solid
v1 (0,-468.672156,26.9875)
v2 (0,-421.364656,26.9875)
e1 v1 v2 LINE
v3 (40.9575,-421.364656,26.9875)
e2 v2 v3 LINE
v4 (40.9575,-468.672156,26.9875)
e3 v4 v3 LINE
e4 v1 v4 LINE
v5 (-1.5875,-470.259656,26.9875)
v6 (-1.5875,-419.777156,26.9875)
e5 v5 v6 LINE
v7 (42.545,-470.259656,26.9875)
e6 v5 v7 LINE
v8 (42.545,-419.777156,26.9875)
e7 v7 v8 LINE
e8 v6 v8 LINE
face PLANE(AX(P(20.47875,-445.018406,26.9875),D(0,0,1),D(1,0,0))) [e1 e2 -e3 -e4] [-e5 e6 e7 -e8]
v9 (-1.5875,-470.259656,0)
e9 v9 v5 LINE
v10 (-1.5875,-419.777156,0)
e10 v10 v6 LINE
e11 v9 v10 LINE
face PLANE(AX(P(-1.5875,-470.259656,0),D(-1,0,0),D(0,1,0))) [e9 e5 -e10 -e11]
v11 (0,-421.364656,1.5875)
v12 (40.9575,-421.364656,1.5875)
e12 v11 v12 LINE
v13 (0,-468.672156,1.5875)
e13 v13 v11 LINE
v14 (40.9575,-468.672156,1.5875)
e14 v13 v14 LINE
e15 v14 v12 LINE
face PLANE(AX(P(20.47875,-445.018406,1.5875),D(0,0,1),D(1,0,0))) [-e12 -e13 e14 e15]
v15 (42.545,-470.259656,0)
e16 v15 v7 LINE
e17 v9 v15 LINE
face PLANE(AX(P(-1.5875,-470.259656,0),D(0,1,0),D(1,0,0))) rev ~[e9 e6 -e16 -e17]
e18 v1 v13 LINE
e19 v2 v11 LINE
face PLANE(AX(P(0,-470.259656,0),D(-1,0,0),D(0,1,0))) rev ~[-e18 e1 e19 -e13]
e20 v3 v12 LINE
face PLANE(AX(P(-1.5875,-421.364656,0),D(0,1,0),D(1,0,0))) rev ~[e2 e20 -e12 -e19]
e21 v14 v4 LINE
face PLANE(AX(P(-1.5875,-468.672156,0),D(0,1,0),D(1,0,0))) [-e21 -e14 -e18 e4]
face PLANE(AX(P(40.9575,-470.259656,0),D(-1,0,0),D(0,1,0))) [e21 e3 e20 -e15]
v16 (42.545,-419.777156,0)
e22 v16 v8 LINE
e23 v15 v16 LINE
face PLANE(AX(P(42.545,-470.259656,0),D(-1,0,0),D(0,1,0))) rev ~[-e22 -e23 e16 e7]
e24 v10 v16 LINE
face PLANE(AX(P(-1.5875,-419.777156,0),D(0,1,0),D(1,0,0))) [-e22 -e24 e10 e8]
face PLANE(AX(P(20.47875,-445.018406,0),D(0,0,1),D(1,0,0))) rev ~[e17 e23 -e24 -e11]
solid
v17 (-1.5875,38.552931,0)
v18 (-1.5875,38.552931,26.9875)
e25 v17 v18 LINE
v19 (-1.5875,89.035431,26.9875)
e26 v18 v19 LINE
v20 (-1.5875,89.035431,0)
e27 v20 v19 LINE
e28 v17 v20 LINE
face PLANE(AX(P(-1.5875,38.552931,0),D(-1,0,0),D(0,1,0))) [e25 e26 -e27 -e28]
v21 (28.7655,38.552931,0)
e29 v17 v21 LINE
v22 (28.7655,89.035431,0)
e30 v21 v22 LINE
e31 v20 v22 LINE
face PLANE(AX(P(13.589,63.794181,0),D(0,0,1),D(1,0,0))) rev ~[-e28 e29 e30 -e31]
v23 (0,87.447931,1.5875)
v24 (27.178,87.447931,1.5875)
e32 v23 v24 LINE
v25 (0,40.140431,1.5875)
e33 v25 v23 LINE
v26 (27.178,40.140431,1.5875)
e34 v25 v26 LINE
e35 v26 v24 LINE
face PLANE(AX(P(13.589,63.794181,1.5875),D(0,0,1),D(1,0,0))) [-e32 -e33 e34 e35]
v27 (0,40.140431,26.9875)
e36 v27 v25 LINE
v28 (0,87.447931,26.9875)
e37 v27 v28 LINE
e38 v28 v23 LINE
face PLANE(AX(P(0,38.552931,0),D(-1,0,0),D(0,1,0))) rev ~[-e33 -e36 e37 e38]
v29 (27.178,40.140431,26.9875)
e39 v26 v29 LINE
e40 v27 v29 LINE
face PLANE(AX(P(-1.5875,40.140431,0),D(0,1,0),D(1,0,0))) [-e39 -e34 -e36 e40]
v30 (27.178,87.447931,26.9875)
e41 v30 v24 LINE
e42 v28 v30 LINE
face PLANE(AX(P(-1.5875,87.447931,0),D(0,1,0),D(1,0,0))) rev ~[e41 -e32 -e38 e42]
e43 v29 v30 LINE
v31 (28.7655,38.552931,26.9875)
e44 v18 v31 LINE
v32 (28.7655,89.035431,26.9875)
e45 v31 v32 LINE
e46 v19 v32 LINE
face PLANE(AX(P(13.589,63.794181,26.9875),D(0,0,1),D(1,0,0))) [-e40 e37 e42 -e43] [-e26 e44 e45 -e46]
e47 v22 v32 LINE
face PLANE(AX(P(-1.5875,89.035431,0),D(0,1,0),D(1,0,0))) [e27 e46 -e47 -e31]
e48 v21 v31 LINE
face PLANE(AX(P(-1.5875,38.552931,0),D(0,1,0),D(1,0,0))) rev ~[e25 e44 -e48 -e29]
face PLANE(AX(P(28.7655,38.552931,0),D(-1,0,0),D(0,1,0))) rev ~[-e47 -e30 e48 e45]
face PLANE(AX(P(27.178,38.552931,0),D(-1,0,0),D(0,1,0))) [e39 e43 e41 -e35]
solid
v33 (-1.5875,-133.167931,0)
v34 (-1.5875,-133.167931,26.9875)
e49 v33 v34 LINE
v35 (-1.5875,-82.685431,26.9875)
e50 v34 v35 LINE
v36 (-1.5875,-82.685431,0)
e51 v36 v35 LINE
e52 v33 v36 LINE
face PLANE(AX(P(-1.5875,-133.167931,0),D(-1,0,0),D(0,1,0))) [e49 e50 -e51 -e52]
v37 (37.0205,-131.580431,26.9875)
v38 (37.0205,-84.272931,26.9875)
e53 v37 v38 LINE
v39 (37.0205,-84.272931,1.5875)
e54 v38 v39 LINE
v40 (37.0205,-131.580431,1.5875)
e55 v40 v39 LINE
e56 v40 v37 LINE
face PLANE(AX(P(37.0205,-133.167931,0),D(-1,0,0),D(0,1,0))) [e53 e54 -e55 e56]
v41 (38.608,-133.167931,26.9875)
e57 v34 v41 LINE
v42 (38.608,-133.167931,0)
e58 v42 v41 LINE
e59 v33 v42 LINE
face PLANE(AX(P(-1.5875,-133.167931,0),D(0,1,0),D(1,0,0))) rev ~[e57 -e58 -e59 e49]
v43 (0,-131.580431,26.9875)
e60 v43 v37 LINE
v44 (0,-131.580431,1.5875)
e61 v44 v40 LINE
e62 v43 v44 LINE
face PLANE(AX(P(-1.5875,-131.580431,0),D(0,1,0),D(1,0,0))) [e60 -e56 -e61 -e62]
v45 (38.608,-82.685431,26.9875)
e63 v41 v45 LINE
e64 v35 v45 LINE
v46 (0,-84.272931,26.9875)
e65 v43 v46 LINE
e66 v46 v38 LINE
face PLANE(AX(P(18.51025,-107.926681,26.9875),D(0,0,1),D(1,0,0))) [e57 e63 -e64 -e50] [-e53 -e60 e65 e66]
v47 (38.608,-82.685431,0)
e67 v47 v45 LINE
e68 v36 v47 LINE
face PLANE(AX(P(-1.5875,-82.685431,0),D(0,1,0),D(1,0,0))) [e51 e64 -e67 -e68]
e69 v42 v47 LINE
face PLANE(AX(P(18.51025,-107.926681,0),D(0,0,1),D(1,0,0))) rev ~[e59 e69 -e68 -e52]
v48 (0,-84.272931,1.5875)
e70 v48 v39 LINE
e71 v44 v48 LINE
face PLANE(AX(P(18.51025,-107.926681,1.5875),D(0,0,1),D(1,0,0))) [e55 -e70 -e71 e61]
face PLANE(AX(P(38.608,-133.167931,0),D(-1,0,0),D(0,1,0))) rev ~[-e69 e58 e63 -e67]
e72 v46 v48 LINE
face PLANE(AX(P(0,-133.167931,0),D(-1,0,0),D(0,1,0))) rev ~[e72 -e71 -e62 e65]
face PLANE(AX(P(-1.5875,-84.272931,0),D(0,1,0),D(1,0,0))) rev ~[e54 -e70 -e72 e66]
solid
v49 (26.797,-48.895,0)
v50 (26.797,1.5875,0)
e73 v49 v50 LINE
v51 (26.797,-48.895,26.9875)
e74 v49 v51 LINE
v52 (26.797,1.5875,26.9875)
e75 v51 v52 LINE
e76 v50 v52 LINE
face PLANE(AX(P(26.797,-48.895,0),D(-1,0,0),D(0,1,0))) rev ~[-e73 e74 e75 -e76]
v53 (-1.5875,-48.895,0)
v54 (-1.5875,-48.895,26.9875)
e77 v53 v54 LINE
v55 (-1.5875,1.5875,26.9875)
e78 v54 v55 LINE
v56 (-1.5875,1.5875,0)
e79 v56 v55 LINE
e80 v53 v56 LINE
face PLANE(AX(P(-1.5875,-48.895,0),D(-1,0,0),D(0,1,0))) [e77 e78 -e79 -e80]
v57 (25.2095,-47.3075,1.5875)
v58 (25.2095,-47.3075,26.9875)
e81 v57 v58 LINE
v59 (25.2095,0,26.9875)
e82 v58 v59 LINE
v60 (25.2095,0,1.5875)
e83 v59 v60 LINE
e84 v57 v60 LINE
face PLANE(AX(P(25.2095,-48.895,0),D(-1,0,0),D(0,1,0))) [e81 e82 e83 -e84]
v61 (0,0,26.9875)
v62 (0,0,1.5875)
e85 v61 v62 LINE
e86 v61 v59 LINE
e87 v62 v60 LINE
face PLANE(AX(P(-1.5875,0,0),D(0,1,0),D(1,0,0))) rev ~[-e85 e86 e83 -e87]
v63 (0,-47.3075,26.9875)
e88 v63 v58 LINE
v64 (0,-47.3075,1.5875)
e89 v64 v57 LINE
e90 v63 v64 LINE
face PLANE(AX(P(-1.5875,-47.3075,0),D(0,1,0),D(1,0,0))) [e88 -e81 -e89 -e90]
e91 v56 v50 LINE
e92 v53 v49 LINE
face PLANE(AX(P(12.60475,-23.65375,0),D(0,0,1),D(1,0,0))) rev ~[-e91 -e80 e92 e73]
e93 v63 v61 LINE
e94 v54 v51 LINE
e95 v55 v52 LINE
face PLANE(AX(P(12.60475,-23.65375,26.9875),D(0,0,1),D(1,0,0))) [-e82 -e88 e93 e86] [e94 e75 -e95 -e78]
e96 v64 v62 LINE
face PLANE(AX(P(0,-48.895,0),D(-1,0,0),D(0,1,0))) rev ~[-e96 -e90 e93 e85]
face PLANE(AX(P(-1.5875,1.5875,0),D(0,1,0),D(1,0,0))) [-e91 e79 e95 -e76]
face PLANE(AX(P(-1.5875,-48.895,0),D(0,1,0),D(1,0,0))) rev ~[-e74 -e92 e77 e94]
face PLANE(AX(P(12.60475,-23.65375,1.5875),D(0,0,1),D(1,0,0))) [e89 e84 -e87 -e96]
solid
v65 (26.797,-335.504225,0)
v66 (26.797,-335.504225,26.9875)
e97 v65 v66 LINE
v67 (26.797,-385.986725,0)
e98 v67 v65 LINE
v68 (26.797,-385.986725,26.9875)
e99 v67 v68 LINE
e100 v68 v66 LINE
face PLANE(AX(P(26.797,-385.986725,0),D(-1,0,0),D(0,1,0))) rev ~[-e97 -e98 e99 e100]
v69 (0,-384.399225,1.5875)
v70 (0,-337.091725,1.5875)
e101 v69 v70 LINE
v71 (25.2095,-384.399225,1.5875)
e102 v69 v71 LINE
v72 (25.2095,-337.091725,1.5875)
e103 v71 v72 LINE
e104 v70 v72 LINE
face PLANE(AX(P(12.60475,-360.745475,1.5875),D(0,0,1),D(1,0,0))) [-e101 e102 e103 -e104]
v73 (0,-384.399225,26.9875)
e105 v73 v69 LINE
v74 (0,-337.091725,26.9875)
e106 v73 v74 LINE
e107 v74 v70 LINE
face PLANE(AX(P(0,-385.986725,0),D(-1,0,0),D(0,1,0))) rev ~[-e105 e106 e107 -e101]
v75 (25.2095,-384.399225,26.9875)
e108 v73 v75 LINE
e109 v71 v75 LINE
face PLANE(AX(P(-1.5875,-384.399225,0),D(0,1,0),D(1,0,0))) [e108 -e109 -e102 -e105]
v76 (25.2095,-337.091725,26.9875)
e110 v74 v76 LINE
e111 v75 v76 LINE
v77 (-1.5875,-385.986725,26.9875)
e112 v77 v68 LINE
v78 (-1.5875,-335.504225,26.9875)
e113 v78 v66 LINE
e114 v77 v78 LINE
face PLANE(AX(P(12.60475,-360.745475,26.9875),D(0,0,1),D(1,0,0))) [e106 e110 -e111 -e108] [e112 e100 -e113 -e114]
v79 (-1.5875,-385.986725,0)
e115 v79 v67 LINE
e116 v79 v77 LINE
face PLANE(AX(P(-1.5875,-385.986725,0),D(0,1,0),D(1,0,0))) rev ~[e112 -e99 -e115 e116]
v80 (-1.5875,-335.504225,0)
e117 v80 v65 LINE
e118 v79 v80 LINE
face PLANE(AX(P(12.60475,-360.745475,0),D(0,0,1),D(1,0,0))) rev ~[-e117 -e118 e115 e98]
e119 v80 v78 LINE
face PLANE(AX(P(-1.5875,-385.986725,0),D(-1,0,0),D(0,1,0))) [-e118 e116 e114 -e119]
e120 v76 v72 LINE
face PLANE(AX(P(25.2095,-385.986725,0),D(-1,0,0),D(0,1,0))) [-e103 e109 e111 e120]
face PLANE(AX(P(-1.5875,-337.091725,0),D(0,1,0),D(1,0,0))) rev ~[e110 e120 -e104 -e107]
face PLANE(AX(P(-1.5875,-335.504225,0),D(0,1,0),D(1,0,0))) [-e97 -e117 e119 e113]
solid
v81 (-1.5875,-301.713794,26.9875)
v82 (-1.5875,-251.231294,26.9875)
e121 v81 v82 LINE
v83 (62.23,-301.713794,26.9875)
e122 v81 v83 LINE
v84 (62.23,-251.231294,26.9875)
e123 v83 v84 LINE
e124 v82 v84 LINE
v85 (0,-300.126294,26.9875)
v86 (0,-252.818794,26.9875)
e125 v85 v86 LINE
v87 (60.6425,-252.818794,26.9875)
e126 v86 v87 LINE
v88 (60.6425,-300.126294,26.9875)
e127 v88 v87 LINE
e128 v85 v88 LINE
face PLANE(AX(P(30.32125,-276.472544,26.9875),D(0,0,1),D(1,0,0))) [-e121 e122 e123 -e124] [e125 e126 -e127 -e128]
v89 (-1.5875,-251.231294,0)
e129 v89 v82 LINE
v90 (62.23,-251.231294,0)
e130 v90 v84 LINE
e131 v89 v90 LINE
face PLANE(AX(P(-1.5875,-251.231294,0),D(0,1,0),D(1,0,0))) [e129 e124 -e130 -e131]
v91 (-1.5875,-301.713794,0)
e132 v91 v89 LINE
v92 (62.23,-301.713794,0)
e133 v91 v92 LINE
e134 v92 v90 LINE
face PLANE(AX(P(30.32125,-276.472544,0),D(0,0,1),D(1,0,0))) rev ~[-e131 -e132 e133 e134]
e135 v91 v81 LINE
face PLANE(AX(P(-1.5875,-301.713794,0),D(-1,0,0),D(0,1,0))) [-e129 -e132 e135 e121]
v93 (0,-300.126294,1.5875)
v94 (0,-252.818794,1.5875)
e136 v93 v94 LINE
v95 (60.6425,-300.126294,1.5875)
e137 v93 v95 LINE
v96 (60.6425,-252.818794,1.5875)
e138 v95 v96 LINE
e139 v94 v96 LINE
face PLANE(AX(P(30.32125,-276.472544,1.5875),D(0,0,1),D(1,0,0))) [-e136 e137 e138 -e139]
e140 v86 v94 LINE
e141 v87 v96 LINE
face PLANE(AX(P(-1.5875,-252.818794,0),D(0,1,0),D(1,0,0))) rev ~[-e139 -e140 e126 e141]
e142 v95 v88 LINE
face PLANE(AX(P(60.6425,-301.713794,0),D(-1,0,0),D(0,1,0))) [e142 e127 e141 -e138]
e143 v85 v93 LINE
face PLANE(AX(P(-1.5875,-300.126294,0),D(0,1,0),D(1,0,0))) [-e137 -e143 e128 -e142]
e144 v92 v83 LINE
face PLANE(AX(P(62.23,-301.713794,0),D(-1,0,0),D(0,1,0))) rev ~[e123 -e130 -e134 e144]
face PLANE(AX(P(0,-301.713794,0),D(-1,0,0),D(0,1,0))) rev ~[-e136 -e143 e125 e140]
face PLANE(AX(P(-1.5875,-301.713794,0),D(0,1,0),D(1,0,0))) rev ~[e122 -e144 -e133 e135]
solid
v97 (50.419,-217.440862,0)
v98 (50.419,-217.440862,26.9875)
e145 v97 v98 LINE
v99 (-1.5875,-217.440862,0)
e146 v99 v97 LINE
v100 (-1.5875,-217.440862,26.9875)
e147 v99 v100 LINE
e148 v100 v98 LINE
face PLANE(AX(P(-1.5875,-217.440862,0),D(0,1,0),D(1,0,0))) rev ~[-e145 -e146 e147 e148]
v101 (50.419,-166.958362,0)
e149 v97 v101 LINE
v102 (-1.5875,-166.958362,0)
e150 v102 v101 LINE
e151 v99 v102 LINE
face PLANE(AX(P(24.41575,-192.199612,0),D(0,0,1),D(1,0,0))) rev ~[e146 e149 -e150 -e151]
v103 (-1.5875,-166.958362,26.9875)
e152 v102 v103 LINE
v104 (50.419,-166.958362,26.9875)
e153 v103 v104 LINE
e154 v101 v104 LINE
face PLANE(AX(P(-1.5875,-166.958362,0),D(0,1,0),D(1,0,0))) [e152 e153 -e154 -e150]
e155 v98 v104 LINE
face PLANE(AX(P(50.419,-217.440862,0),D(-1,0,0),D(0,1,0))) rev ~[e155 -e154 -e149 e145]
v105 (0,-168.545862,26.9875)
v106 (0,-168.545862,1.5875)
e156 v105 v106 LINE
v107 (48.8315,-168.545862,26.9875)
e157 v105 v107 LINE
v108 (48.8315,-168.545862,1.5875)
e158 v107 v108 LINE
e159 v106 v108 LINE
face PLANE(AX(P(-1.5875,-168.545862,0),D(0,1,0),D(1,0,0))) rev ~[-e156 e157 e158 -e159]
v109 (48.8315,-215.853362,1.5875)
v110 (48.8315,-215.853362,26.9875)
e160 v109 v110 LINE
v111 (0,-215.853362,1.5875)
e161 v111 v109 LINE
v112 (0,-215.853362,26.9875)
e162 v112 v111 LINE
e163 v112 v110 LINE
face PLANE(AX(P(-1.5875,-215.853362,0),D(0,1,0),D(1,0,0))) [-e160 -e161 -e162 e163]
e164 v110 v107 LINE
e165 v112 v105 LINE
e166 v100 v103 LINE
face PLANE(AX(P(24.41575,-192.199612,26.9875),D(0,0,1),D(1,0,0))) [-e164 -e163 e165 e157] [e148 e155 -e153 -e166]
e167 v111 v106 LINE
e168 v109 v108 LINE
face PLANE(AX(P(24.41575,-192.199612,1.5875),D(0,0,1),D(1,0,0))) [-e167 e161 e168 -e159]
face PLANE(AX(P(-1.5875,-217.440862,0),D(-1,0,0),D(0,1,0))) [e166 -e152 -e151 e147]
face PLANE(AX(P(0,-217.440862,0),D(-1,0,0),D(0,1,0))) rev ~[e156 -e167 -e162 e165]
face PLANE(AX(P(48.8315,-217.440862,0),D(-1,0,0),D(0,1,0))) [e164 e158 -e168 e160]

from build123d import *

# Parameters (mm, degrees)
F3_W     = 30.353
F3_H     = 50.4825
F4_DEPTH = 26.9875
F3_W_2   = 28.3845
F3_W_3   = 40.1955
F3_W_4   = 52.0065
F3_W_5   = 63.8175
F3_W_6   = 44.1325
F5_T     = -1.5875
F5_2_T   = -1.5875
F5_3_T   = -1.5875
F5_4_T   = -1.5875
F5_5_T   = -1.5875
F5_6_T   = -1.5875
F5_7_T   = -1.5875


# Not quite as in the source:
# - a variable given as a bare number and used for a length is read in inches; the dataset says mm whatever the document's units were
# - a feature names something its author has since deleted; it is built from what else it names


with BuildPart() as f4:
    # F3 (on Top) → F4 (new body)
    with BuildSketch(Plane.XY):
        with Locations((13.589, 63.7941811943)):
            Rectangle(F3_W, F3_H)
    extrude(amount=F4_DEPTH)

    # F5#7
    f5_7_openings = [f4.faces().sort_by_distance(p)[0] for p in [
        (13.589, 63.794181, 26.9875),
    ]]
    offset(amount=F5_7_T, openings=f5_7_openings)


with BuildPart() as f4b:
    # F3 (on Top) → F4, piece 2 (new body)
    with BuildSketch(Plane.XY):
        with Locations((12.60475, -23.65375)):
            Rectangle(F3_W_2, F3_H)
    extrude(amount=F4_DEPTH)

    # F5#6
    f5_6_openings = [f4b.faces().sort_by_distance(p)[0] for p in [
        (12.60475, -23.65375, 26.9875),
    ]]
    offset(amount=F5_6_T, openings=f5_6_openings)


with BuildPart() as f4c:
    # F3 (on Top) → F4, piece 3 (new body)
    with BuildSketch(Plane.XY):
        with Locations((18.51025, -107.9266811943)):
            Rectangle(F3_W_3, F3_H)
    extrude(amount=F4_DEPTH)

    # F5#5
    f5_5_openings = [f4c.faces().sort_by_distance(p)[0] for p in [
        (18.51025, -107.926681, 26.9875),
    ]]
    offset(amount=F5_5_T, openings=f5_5_openings)


with BuildPart() as f4d:
    # F3 (on Top) → F4, piece 4 (new body)
    with BuildSketch(Plane.XY):
        with Locations((24.41575, -192.1996123886)):
            Rectangle(F3_W_4, F3_H)
    extrude(amount=F4_DEPTH)

    # F5#4
    f5_4_openings = [f4d.faces().sort_by_distance(p)[0] for p in [
        (24.41575, -192.199612, 26.9875),
    ]]
    offset(amount=F5_4_T, openings=f5_4_openings)


with BuildPart() as f4e:
    # F3 (on Top) → F4, piece 5 (new body)
    with BuildSketch(Plane.XY):
        with Locations((30.32125, -276.4725435829)):
            Rectangle(F3_W_5, F3_H)
    extrude(amount=F4_DEPTH)

    # F5#3
    f5_3_openings = [f4e.faces().sort_by_distance(p)[0] for p in [
        (30.32125, -276.472544, 26.9875),
    ]]
    offset(amount=F5_3_T, openings=f5_3_openings)


with BuildPart() as f4f:
    # F3 (on Top) → F4, piece 6 (new body)
    with BuildSketch(Plane.XY):
        with Locations((12.60475, -360.7454747772)):
            Rectangle(F3_W_2, F3_H)
    extrude(amount=F4_DEPTH)

    # F5#2
    f5_2_openings = [f4f.faces().sort_by_distance(p)[0] for p in [
        (12.60475, -360.745475, 26.9875),
    ]]
    offset(amount=F5_2_T, openings=f5_2_openings)


with BuildPart() as f4g:
    # F3 (on Top) → F4, piece 7 (new body)
    with BuildSketch(Plane.XY):
        with Locations((20.47875, -445.0184059715)):
            Rectangle(F3_W_6, F3_H)
    extrude(amount=F4_DEPTH)

    # F5
    f5_openings = [f4g.faces().sort_by_distance(p)[0] for p in [
        (20.47875, -445.018406, 26.9875),
    ]]
    offset(amount=F5_T, openings=f5_openings)


solid = Compound([f4.part, f4b.part, f4c.part, f4d.part, f4e.part, f4f.part, f4g.part])
